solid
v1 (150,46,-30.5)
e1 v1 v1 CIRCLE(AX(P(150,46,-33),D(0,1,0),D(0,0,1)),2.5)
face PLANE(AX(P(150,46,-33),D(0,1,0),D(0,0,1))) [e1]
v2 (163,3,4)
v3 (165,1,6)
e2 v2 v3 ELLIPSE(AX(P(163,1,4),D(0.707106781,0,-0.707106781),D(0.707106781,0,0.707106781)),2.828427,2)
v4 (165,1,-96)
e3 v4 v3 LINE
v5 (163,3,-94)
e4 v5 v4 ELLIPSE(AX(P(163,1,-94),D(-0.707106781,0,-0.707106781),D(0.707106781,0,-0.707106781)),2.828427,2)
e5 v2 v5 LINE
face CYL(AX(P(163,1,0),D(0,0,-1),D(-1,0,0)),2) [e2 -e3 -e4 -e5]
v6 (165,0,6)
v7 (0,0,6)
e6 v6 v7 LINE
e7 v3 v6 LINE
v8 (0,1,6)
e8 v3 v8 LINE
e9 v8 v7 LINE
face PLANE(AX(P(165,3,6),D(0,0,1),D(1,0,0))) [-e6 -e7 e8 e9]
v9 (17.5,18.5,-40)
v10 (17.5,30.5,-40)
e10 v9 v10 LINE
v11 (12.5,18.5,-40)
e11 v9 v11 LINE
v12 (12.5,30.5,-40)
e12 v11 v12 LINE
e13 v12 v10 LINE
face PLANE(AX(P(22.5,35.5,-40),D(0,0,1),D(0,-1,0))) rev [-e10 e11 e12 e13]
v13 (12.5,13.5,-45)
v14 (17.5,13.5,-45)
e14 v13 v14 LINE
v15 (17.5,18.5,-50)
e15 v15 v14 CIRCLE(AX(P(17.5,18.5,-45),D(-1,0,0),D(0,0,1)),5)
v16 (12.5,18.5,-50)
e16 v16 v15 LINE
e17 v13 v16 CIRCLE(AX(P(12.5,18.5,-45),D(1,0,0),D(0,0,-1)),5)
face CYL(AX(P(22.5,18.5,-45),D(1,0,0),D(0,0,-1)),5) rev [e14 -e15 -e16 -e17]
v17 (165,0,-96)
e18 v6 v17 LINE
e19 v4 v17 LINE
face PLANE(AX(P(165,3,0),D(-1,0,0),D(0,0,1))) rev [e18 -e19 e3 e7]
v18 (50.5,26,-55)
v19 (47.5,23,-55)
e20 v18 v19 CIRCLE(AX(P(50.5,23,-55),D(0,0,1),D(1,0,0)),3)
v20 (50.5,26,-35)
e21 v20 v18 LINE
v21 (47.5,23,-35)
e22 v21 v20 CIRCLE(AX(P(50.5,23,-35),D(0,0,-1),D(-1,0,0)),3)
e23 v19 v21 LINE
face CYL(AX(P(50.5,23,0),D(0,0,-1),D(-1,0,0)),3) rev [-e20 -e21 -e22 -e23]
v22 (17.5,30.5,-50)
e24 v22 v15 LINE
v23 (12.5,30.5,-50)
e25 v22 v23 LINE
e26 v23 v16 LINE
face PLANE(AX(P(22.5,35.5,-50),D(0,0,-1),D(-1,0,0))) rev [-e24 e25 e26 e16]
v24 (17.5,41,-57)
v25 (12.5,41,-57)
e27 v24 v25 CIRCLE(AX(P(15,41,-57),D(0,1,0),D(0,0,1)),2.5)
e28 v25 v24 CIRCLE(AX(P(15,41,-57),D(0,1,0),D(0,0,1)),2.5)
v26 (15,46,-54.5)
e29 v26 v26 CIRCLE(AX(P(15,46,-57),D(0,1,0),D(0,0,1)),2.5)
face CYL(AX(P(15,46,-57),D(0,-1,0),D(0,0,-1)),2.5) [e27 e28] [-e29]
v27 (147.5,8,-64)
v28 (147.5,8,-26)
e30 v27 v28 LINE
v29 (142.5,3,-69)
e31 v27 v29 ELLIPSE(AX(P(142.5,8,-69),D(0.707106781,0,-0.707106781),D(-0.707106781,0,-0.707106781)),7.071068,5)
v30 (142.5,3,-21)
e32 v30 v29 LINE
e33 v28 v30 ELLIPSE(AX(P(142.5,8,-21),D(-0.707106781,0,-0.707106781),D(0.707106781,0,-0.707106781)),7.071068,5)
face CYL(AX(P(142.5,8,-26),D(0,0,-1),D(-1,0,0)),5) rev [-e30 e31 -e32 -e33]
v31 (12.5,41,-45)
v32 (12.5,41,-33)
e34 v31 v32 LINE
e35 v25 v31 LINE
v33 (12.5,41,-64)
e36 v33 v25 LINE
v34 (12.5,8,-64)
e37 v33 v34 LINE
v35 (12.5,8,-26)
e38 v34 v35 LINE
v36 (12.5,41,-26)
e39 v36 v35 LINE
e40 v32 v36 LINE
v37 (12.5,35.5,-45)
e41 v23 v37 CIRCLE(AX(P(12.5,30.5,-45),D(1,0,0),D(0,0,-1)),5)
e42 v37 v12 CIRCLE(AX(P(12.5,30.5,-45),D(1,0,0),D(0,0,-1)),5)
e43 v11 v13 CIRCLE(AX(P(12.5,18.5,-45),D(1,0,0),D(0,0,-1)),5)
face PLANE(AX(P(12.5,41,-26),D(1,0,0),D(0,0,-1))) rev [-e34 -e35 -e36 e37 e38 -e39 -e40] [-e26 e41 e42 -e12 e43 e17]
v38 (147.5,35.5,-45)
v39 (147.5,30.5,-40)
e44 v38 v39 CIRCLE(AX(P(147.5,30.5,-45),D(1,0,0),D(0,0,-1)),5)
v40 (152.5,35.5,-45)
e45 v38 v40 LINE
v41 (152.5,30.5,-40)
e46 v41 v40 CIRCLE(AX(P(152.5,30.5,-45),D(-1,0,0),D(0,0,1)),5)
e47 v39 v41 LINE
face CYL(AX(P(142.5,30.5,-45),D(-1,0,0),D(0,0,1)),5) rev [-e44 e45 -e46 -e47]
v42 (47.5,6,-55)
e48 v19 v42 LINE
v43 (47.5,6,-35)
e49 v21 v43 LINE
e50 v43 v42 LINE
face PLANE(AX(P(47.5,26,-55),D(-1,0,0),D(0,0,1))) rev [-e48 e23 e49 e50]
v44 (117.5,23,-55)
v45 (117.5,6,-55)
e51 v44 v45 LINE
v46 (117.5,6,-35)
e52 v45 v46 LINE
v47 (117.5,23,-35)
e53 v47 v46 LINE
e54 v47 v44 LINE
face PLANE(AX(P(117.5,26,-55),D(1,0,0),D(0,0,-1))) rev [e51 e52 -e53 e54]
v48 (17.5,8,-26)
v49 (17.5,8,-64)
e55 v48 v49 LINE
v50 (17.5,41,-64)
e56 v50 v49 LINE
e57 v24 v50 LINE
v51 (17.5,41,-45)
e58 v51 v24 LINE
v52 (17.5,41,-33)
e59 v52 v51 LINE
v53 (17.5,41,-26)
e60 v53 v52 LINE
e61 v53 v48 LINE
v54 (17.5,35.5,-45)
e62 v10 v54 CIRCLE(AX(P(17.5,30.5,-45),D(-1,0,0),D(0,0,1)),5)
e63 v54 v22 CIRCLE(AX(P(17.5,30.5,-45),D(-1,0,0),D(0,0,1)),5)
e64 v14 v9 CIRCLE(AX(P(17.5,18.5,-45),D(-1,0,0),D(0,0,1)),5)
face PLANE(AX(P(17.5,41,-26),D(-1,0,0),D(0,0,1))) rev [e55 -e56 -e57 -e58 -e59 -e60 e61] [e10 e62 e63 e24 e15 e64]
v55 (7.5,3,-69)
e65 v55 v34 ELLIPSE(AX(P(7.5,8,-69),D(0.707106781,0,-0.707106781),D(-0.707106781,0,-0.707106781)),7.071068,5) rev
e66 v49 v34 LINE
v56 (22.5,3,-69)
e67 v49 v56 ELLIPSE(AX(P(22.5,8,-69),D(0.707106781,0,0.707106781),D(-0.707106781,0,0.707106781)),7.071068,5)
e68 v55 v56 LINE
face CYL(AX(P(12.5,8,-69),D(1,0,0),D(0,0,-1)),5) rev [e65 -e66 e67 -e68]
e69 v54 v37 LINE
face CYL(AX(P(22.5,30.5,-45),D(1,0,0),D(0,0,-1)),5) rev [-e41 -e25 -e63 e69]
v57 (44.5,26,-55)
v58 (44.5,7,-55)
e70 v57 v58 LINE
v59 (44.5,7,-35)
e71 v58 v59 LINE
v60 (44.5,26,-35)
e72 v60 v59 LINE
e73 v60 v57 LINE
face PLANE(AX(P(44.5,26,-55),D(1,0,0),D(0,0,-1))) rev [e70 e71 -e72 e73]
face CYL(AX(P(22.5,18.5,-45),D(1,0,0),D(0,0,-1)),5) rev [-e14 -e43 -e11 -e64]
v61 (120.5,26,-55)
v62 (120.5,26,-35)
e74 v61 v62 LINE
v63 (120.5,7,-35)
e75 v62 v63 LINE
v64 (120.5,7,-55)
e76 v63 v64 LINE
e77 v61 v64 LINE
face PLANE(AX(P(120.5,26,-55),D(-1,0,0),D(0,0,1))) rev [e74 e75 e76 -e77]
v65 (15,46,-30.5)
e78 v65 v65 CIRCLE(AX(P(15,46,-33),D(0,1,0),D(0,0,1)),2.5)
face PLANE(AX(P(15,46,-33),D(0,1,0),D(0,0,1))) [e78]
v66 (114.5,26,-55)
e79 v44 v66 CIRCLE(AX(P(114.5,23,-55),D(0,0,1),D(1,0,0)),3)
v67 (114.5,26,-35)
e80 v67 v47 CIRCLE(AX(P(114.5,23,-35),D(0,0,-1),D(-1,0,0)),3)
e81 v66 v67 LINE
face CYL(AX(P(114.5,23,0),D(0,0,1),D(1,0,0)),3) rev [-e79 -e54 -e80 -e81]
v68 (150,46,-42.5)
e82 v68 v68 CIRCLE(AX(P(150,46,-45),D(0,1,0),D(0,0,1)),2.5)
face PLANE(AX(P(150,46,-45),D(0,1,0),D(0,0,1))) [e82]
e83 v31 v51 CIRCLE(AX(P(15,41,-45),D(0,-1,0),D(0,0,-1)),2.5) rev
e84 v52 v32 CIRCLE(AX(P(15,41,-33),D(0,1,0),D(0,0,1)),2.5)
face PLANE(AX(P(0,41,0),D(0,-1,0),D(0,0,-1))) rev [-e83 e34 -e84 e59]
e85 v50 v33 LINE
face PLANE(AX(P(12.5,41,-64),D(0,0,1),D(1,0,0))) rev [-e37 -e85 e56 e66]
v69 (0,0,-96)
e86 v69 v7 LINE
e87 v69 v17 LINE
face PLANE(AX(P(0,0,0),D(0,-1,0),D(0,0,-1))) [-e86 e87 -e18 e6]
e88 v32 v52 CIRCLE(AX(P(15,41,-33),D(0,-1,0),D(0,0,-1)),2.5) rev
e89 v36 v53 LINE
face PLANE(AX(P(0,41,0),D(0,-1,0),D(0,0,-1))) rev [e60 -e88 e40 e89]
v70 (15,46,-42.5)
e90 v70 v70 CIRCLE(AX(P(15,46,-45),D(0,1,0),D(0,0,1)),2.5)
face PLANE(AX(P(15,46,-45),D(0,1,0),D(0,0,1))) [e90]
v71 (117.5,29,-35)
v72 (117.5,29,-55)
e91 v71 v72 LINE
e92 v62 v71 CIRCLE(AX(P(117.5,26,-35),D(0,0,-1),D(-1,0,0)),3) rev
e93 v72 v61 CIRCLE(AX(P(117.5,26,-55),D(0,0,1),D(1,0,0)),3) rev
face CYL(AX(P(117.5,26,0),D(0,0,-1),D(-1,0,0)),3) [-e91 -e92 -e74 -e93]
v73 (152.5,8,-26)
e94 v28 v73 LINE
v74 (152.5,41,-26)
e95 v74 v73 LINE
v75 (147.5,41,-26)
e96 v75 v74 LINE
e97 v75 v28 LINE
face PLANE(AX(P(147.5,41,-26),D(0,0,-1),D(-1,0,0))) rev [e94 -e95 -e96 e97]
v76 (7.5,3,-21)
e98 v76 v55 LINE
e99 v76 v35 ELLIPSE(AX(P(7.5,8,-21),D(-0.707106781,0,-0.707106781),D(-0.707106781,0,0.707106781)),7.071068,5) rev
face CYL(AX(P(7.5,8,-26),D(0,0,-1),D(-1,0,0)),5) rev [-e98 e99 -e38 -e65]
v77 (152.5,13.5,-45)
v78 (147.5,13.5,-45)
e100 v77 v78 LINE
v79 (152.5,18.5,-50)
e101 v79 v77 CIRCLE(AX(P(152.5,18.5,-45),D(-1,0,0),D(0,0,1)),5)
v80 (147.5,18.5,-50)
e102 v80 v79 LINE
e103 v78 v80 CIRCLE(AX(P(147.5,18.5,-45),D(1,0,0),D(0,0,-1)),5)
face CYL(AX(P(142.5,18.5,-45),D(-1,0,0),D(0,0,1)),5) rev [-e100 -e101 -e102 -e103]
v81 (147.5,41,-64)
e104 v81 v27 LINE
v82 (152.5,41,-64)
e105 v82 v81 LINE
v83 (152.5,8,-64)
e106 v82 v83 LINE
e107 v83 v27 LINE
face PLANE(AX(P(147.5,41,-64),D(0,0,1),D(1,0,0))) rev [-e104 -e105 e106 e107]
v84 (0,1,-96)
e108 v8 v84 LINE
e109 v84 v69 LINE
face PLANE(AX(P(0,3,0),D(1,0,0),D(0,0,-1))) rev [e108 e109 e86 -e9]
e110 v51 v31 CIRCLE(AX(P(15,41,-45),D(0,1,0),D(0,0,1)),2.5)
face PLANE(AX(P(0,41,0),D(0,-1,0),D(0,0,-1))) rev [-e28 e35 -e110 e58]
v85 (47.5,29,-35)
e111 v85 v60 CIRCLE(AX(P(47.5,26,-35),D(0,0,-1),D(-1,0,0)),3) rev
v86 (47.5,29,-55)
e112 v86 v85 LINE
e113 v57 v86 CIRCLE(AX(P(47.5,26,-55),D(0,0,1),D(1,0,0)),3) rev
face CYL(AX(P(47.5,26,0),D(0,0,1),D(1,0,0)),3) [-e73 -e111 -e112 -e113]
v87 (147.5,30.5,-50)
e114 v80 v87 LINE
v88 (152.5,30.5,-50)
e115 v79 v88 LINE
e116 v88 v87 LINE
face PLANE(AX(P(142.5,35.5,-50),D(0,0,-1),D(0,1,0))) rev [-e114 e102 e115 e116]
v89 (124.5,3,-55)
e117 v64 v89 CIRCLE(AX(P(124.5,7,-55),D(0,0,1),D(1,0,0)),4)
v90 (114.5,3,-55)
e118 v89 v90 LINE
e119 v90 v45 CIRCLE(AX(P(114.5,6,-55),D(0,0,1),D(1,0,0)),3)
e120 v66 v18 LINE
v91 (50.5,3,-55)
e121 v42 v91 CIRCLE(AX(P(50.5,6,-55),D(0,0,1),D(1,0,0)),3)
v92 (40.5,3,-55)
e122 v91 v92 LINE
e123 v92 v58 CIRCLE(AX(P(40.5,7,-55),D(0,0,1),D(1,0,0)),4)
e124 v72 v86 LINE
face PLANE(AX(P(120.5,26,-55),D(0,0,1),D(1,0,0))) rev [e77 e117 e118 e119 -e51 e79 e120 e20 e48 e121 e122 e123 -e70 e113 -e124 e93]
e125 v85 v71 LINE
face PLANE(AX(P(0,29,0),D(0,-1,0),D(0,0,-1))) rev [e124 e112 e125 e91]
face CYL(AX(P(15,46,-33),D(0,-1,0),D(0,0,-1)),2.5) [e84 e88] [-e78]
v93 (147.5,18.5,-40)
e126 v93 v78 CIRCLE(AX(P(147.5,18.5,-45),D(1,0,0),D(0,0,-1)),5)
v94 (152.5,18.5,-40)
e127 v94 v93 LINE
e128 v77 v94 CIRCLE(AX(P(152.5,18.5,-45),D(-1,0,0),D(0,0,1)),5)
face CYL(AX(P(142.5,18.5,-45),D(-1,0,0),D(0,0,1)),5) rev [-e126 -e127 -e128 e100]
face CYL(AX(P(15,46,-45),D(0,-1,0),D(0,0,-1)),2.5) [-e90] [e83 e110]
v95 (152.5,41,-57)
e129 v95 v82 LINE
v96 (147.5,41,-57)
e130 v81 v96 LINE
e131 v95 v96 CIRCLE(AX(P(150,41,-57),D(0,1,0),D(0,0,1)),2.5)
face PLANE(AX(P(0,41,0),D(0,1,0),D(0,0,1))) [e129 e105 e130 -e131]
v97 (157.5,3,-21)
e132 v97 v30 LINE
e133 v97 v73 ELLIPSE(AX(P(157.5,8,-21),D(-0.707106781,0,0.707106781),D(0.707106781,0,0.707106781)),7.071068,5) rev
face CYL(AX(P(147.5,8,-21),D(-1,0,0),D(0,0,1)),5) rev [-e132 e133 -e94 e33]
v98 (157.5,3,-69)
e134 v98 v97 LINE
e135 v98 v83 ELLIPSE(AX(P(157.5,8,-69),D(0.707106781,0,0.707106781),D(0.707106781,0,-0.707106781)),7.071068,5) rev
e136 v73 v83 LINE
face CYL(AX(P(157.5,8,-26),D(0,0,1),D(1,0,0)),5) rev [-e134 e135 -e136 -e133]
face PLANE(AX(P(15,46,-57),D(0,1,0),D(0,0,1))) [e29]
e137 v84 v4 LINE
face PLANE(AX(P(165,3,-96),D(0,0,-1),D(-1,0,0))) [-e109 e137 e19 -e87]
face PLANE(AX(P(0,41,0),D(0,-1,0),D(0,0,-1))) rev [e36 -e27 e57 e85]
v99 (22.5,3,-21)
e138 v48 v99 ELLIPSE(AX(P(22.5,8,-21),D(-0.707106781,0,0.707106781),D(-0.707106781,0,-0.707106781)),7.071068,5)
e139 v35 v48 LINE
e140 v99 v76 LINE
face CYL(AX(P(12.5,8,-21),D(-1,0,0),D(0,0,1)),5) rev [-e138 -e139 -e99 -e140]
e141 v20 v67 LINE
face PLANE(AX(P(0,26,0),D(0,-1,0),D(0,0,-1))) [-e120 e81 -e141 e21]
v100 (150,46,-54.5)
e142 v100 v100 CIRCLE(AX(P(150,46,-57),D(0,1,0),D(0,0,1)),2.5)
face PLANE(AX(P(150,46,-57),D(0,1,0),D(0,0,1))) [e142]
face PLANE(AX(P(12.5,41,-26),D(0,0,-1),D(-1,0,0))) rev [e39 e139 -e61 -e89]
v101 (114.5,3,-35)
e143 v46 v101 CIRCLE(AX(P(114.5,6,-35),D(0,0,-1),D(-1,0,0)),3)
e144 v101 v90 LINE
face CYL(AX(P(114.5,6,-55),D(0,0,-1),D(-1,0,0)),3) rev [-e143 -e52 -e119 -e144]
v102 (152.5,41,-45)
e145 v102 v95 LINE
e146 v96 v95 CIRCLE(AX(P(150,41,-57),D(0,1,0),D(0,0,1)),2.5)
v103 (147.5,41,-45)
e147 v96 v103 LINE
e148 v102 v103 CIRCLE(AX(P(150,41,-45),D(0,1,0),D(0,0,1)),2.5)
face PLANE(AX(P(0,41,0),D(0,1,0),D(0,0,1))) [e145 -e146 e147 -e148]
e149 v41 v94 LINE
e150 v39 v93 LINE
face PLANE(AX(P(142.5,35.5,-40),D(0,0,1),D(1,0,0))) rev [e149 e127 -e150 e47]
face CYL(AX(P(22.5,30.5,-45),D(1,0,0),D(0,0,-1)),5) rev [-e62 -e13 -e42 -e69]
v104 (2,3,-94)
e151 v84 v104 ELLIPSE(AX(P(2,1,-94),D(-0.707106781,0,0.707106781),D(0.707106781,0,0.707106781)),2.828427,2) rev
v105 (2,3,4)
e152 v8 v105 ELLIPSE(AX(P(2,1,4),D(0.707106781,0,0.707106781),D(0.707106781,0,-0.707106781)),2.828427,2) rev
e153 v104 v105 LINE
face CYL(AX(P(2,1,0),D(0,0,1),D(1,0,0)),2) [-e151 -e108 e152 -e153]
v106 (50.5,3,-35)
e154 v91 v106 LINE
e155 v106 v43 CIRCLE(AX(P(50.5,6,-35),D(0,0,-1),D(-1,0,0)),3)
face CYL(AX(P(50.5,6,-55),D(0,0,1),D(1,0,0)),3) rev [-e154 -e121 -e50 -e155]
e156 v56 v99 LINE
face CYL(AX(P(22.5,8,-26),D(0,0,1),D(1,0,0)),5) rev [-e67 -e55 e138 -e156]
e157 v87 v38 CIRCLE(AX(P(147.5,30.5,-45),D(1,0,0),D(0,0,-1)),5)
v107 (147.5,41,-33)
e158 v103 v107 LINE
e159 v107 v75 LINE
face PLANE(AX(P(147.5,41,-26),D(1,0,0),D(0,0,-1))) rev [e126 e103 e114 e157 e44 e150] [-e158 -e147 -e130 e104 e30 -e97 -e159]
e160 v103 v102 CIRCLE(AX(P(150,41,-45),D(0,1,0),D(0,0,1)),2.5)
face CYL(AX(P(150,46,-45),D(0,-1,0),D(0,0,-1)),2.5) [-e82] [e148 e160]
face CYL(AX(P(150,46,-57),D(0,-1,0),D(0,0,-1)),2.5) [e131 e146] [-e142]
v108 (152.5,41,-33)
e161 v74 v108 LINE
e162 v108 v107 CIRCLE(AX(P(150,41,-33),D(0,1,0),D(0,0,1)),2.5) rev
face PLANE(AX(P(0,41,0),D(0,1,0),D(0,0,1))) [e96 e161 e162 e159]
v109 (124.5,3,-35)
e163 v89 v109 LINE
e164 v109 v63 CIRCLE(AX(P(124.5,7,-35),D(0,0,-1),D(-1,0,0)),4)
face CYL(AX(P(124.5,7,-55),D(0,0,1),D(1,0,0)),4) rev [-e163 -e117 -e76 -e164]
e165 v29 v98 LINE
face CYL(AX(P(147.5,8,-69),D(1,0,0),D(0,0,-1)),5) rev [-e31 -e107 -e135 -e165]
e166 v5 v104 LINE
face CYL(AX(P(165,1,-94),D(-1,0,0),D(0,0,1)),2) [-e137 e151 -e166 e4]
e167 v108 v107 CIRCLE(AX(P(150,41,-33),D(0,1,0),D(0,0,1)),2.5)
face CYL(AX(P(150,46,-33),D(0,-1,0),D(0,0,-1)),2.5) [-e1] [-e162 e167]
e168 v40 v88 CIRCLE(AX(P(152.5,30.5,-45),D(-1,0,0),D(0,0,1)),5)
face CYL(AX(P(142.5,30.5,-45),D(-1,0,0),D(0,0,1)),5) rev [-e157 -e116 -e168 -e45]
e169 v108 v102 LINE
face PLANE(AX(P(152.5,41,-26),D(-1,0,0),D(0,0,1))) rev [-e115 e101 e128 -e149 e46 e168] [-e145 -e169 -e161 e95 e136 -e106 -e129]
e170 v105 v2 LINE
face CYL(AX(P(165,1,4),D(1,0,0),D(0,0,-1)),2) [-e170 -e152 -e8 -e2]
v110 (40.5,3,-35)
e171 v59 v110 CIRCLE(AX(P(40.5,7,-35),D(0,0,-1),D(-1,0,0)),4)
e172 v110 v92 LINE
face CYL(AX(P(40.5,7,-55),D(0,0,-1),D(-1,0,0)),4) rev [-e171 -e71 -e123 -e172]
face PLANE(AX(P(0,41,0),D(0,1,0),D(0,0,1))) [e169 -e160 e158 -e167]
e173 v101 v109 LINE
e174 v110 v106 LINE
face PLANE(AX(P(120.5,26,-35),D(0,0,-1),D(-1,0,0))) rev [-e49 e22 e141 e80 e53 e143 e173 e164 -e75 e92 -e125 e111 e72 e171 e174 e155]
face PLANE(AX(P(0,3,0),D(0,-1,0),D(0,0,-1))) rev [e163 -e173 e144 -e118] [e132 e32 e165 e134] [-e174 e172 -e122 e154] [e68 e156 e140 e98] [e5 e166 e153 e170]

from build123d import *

# Parameters (mm, degrees)
SKETCH1_W            = 165
SKETCH1_H            = 90
BOSS_EXTRUDE1_DEPTH  = 3
SKETCH2_W            = 5
SKETCH2_H            = 38
BOSS_EXTRUDE3_DEPTH  = 38
FILLET1_R            = 5
SKETCH3_R            = 2.5
BOSS_EXTRUDE4_DEPTH  = 5
SKETCH4_W            = 3
SKETCH4_H            = 20
BOSS_EXTRUDE5_DEPTH  = 23
SKETCH5_W            = 76
SKETCH5_H            = 20
BOSS_EXTRUDE6_DEPTH  = 3
FILLET3_R            = 3
FILLET4_R            = 3
SKETCH8_W            = 10
SKETCH8_H            = 22
CUT_EXTRUDE1_DEPTH   = 10
FILLET10_R           = 5
SKETCH9_W            = 10
SKETCH9_H            = 22
CUT_EXTRUDE2_DEPTH   = 10
FILLET11_R           = 5
SKETCH10_W           = 165
SKETCH10_H           = 6
BOSS_EXTRUDE9_DEPTH  = 3
FILLET13_R           = 4
SKETCH11_R           = 2.5
BOSS_EXTRUDE10_DEPTH = 5
FILLET14_R           = 2


with BuildPart() as part:
    # Sketch1 → Boss-Extrude1 (new body)
    with BuildSketch(Plane(origin=(0, 0, 0), x_dir=(1, 0, 0), z_dir=(0, 1, 0))):
        with Locations((82.5, 45)):
            Rectangle(SKETCH1_W, SKETCH1_H)
    extrude(amount=BOSS_EXTRUDE1_DEPTH)

    # Sketch2 → Boss-Extrude3 (add)
    with BuildSketch(Plane(origin=(0, 3, 0), x_dir=(1, 0, 0), z_dir=(0, 1, 0))):
        with Locations((15, 45)):
            Rectangle(SKETCH2_W, SKETCH2_H)
        with Locations((150, 45)):
            Rectangle(SKETCH2_W, SKETCH2_H)
    extrude(amount=BOSS_EXTRUDE3_DEPTH)

    # Fillet1
    fillet1_edges = [part.edges().sort_by_distance(p)[0] for p in [
        (12.5, 3, -45),
        (15, 3, -26),
        (17.5, 3, -45),
        (15, 3, -64),
        (150, 3, -64),
        (147.5, 3, -45),
        (150, 3, -26),
        (152.5, 3, -45),
    ]]
    fillet(fillet1_edges, radius=FILLET1_R)

    # Sketch3 → Boss-Extrude4 (add)
    with BuildSketch(Plane(origin=(0, 41, 0), x_dir=(1, 0, 0), z_dir=(0, 1, 0))):
        with Locations(Location((15, 57, 0), (0, 0, 180))):
            Circle(SKETCH3_R)
        with Locations(Location((15, 33, 0), (0, 0, 180))):
            Circle(SKETCH3_R)
        with Locations(Location((150, 57, 0), (0, 0, 180))):
            Circle(SKETCH3_R)
        with Locations(Location((150, 33, 0), (0, 0, 180))):
            Circle(SKETCH3_R)
    extrude(amount=BOSS_EXTRUDE4_DEPTH)

    # Sketch4 → Boss-Extrude5 (add)
    with BuildSketch(Plane(origin=(0, 3, 0), x_dir=(1, 0, 0), z_dir=(0, 1, 0))):
        with Locations((119, 45)):
            Rectangle(SKETCH4_W, SKETCH4_H)
        with Locations((46, 45)):
            Rectangle(SKETCH4_W, SKETCH4_H)
    extrude(amount=BOSS_EXTRUDE5_DEPTH)

    # Sketch5 → Boss-Extrude6 (add)
    with BuildSketch(Plane(origin=(0, 26, 0), x_dir=(1, 0, 0), z_dir=(0, 1, 0))):
        with Locations((82.5, 45)):
            Rectangle(SKETCH5_W, SKETCH5_H)
    extrude(amount=BOSS_EXTRUDE6_DEPTH)

    # Fillet3
    fillet3_edges = [part.edges().sort_by_distance(p)[0] for p in [
        (47.5, 3, -45),
        (47.5, 26, -45),
        (117.5, 3, -45),
        (117.5, 26, -45),
    ]]
    fillet(fillet3_edges, radius=FILLET3_R)

    # Fillet4
    fillet4_edges = [part.edges().sort_by_distance(p)[0] for p in [
        (120.5, 29, -45),
        (44.5, 29, -45),
    ]]
    fillet(fillet4_edges, radius=FILLET4_R)

    # Sketch8 → Cut-Extrude1 (cut)
    with BuildSketch(Plane.ZY.offset(-12.5)):
        with Locations((-45, 24.5)):
            Rectangle(SKETCH8_W, SKETCH8_H)
    extrude(amount=-CUT_EXTRUDE1_DEPTH, mode=Mode.SUBTRACT)

    # Fillet10
    fillet10_edges = [part.edges().sort_by_distance(p)[0] for p in [
        (15, 13.5, -50),
        (15, 35.5, -50),
        (15, 13.5, -40),
        (15, 35.5, -40),
    ]]
    fillet(fillet10_edges, radius=FILLET10_R - 0.0001)  # a hair under: the kernel refuses the full size

    # Sketch9 → Cut-Extrude2 (cut)
    with BuildSketch(Plane(origin=(152.5, 0, 0), x_dir=(0, 0, -1), z_dir=(1, 0, 0))):
        with Locations((45, 24.5)):
            Rectangle(SKETCH9_W, SKETCH9_H)
    extrude(amount=-CUT_EXTRUDE2_DEPTH, mode=Mode.SUBTRACT)

    # Fillet11
    fillet11_edges = [part.edges().sort_by_distance(p)[0] for p in [
        (150, 35.5, -40),
        (150, 13.5, -40),
        (150, 13.5, -50),
        (150, 35.5, -50),
    ]]
    fillet(fillet11_edges, radius=FILLET11_R - 0.0001)  # a hair under: the kernel refuses the full size

    # Sketch10 → Boss-Extrude9 (add)
    with BuildSketch(Plane.XZ):
        with Locations((82.5, -93)):
            Rectangle(SKETCH10_W, SKETCH10_H)
        with Locations((82.5, 3)):
            Rectangle(SKETCH10_W, SKETCH10_H)
    extrude(amount=-BOSS_EXTRUDE9_DEPTH)

    # Fillet13
    fillet13_edges = [part.edges().sort_by_distance(p)[0] for p in [
        (44.5, 3, -45),
        (120.5, 3, -45),
    ]]
    fillet(fillet13_edges, radius=FILLET13_R)

    # Sketch11 → Boss-Extrude10 (add)
    with BuildSketch(Plane(origin=(0, 41, 0), x_dir=(1, 0, 0), z_dir=(0, 1, 0))):
        with Locations(Location((150, 45, 0), (0, 0, 180))):
            Circle(SKETCH11_R)
        with Locations(Location((15, 45, 0), (0, 0, 180))):
            Circle(SKETCH11_R)
    extrude(amount=BOSS_EXTRUDE10_DEPTH)

    # Fillet14
    fillet14_edges = [part.edges().sort_by_distance(p)[0] for p in [
        (165, 3, -45),
        (82.5, 3, -96),
        (82.5, 3, 6),
        (0, 3, -45),
    ]]
    fillet(fillet14_edges, radius=FILLET14_R)


solid = part.part
